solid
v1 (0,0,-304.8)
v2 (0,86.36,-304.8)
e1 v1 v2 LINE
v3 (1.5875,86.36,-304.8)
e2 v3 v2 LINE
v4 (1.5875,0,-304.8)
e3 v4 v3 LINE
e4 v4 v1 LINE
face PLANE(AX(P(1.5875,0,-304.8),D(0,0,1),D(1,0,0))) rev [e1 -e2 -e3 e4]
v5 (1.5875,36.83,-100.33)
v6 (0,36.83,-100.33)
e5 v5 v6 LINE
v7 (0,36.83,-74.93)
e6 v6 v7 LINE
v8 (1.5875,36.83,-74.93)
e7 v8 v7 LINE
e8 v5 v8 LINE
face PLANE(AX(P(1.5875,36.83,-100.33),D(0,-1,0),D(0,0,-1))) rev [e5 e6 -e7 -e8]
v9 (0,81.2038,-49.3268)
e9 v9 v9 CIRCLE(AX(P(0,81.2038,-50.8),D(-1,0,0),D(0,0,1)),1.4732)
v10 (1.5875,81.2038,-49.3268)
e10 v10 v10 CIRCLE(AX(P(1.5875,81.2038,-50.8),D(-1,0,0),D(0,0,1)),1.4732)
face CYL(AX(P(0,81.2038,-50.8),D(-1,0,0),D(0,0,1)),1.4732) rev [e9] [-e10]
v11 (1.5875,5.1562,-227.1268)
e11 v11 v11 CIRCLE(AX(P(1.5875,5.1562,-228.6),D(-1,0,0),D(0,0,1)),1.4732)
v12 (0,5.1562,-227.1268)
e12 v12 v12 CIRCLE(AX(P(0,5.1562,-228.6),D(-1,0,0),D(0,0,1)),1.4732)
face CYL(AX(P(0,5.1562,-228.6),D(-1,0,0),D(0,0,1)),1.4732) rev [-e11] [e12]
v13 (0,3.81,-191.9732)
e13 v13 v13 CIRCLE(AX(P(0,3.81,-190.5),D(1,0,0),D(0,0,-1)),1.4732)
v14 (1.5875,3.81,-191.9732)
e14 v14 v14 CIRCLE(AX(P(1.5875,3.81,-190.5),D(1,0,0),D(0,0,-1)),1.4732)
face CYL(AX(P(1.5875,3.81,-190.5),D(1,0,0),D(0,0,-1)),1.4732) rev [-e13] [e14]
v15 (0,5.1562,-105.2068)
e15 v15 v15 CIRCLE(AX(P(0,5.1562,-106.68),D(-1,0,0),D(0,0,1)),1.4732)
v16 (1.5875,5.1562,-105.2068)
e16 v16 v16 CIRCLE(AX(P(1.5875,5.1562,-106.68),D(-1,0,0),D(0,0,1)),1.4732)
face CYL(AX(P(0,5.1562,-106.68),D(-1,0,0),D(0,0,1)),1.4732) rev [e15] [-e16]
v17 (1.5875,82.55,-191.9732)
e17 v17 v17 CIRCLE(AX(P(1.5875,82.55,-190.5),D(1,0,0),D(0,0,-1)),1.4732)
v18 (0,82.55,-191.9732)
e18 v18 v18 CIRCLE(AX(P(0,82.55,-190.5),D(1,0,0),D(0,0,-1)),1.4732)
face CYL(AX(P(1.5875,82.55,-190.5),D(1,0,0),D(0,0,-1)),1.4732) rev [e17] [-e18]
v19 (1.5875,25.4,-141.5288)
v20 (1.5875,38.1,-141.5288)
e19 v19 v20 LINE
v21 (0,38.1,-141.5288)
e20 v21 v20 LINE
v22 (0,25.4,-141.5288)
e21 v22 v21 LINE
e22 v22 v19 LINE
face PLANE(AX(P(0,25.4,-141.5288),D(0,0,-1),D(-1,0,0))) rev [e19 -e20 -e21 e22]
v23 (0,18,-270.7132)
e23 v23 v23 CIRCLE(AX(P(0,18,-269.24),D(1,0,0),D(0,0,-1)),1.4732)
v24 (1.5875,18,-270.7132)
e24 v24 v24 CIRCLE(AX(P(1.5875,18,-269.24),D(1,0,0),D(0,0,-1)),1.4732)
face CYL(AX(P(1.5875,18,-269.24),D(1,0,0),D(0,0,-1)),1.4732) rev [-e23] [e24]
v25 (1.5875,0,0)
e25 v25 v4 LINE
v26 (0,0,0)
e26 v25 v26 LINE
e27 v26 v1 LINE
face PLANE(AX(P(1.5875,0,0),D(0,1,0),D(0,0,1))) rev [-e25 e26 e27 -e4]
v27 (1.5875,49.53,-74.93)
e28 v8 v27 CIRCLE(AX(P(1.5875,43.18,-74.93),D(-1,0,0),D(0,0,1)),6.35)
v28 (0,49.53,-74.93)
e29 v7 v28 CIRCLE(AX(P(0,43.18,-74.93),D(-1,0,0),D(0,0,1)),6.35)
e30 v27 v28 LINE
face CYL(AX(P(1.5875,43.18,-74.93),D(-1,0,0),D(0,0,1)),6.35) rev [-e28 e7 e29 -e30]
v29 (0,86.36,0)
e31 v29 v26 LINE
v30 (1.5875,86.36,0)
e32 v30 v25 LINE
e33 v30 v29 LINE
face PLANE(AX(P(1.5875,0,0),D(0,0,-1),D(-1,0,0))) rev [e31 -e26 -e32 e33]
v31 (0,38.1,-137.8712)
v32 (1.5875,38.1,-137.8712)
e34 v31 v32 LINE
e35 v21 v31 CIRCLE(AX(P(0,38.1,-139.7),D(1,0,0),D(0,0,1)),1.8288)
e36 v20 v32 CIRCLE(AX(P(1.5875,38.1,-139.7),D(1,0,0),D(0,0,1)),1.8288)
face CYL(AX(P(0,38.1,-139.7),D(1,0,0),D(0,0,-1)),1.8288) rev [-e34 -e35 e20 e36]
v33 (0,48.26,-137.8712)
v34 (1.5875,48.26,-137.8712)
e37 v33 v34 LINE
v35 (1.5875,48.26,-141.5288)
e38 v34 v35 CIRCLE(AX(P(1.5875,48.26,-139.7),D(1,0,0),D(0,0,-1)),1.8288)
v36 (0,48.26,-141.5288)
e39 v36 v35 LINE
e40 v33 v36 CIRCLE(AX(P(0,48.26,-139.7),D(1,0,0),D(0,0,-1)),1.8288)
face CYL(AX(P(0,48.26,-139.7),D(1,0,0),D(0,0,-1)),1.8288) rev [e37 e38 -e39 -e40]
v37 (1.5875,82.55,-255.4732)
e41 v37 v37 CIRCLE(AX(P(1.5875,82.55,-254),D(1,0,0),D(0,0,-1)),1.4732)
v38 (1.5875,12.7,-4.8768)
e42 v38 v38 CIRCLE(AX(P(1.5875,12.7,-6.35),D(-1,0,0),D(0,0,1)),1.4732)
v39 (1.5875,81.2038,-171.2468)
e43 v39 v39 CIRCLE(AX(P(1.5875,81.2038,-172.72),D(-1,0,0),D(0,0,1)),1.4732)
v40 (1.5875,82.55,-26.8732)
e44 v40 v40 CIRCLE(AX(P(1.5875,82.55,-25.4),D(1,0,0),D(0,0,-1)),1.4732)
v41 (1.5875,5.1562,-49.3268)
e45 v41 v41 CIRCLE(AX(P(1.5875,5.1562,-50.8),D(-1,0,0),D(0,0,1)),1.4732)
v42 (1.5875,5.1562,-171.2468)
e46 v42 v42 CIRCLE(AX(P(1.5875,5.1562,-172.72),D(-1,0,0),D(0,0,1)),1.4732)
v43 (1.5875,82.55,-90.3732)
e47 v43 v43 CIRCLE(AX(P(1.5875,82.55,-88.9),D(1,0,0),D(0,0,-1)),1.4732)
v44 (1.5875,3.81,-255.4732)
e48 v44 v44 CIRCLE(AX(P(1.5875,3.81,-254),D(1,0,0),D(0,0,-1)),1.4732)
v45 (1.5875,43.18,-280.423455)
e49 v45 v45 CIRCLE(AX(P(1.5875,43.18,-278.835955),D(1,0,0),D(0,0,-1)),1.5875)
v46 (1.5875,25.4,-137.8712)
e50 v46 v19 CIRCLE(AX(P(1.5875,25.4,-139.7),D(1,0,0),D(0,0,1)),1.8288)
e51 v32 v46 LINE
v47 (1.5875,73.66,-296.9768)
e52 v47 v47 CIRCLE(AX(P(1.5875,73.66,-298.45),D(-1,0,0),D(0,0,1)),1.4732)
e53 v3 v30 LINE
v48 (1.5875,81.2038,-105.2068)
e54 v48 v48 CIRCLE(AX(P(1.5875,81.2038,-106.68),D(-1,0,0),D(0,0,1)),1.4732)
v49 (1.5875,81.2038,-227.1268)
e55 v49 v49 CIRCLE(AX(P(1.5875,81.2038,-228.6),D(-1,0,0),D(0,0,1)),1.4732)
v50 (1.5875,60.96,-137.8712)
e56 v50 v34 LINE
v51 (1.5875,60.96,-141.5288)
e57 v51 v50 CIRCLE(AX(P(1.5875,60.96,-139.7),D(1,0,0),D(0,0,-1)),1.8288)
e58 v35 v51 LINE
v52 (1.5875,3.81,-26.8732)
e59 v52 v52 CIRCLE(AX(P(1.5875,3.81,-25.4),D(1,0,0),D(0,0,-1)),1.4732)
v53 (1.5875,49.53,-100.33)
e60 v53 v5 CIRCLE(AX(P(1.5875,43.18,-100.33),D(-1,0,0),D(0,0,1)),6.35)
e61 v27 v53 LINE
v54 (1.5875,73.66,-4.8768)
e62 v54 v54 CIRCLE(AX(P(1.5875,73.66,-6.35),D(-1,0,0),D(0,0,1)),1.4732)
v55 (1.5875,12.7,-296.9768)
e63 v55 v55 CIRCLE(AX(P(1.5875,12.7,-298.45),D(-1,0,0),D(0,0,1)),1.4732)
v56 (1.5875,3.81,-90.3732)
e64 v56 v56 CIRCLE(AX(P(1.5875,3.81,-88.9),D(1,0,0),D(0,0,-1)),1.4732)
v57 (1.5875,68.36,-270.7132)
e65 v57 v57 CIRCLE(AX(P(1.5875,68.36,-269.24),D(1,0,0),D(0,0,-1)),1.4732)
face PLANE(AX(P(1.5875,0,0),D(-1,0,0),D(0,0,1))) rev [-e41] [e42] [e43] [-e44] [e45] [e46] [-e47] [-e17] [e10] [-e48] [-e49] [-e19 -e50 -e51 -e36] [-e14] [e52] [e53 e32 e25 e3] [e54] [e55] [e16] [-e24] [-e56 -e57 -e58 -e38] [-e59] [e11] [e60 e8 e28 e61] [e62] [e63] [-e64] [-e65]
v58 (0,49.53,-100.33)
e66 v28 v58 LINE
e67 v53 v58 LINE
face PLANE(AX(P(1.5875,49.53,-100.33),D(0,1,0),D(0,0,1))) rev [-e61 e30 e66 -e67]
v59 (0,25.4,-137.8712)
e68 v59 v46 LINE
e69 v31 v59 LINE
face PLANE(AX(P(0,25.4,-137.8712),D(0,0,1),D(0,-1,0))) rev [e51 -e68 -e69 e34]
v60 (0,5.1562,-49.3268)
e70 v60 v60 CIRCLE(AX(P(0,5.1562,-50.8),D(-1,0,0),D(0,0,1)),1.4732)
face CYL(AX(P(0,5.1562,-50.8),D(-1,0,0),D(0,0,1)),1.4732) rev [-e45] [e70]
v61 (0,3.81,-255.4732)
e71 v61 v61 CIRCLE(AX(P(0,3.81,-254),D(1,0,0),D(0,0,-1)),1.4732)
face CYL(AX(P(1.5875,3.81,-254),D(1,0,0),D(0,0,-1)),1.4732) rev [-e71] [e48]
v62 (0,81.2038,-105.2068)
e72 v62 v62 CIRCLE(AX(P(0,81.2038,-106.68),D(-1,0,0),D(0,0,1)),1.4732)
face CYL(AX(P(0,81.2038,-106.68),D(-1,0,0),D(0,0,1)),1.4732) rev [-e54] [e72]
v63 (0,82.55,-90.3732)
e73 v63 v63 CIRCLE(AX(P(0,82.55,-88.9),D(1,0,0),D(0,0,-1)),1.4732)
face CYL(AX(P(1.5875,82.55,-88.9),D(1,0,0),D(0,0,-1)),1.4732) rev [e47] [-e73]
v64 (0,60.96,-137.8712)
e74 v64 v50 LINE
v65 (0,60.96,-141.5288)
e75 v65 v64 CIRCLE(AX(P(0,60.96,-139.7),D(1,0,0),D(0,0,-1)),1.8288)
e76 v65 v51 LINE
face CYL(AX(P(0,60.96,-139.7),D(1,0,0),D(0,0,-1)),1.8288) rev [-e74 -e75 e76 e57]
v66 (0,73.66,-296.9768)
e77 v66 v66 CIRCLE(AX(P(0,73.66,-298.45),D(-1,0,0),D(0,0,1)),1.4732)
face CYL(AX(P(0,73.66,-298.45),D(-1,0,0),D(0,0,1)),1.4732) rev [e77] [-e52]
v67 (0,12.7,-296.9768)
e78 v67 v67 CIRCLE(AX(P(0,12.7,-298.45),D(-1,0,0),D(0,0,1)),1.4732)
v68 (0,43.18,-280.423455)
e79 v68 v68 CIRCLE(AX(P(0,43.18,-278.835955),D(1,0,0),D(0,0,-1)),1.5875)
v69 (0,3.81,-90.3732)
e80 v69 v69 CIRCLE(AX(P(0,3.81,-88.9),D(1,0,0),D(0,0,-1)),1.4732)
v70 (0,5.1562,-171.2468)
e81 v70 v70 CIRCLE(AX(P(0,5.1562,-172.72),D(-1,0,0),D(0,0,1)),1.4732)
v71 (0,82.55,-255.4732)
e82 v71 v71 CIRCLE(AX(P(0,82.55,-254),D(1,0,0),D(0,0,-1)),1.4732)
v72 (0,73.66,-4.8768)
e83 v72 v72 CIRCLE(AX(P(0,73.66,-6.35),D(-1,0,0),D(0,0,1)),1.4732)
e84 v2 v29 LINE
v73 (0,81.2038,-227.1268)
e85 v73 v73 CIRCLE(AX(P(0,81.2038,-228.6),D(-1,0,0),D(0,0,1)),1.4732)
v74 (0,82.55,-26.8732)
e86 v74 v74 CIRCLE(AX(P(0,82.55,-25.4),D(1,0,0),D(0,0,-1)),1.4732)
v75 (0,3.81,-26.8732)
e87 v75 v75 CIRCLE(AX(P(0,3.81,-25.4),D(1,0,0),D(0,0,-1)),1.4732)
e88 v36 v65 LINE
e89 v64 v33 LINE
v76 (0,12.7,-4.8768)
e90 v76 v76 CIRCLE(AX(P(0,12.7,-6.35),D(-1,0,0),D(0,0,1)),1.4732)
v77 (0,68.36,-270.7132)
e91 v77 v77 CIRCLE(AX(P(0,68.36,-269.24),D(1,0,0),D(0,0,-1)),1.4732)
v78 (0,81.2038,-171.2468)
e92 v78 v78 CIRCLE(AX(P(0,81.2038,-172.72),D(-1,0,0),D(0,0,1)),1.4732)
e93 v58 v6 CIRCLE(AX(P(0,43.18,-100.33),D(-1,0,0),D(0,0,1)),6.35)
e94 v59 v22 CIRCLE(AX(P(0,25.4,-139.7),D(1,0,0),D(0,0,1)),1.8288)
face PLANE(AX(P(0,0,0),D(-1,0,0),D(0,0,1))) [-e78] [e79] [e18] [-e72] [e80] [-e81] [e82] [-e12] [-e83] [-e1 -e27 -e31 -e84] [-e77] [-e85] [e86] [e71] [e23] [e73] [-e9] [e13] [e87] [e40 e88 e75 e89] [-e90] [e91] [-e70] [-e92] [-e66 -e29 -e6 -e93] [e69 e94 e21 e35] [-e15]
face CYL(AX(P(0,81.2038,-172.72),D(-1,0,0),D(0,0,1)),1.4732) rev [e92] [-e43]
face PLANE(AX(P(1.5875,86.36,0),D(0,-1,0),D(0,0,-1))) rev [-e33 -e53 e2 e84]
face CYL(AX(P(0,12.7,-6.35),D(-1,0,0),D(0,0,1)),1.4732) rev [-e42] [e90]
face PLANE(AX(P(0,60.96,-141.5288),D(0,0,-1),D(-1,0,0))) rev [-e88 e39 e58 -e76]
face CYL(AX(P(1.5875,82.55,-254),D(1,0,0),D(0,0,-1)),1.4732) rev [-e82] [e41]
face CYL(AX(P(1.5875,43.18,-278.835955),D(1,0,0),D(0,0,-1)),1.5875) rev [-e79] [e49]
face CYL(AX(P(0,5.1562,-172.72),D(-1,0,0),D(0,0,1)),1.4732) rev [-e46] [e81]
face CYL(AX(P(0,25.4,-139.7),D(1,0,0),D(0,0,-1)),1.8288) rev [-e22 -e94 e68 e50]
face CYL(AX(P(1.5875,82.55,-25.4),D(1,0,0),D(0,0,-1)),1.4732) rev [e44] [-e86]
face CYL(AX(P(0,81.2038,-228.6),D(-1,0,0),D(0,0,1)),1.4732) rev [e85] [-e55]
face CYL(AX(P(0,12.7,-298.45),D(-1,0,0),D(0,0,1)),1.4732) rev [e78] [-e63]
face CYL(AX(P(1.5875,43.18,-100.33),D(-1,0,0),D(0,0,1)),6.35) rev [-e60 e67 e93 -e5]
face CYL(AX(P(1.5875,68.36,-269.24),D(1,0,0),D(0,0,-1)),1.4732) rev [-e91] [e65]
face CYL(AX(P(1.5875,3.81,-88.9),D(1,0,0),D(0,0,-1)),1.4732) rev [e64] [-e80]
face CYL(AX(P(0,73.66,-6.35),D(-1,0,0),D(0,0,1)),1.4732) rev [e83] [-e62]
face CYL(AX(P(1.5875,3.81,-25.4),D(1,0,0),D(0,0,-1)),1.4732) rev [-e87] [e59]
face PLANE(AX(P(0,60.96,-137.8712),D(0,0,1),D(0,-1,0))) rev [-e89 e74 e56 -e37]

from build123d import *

# Parameters (mm, degrees)
SKETCH1_W                     = 304.8
SKETCH1_H                     = 86.36
BOSS_EXTRUDE1_DEPTH           = 1.5875
F_4_CLEARANCE_HOLE1_OUTLINE_R = 1.4732
F_4_CLEARANCE_HOLE1_DEPTH     = 1.5875
F_1_8_0_125_DIAMETER_HOLE1_D  = 3.175
CUT_EXTRUDE1_DEPTH            = 317.802161855
F_4_CLEARANCE_HOLE2_D         = 2.9464
F_4_CLEARANCE_HOLE2_DEPTH     = 9.1694
F_4_CLEARANCE_HOLE2_TIP       = 0.885187864
CUT_EXTRUDE3_DEPTH            = 317.802161855
F_4_CLEARANCE_HOLE3_D         = 2.9464
F_4_CLEARANCE_HOLE3_DEPTH     = 9.1694
F_4_CLEARANCE_HOLE3_TIP       = 0.885187864


# Read off the part's stored shape, not the designer's step: #4 Clearance Hole1
with BuildPart() as part:
    # Sketch1 → Boss-Extrude1 (new body)
    with BuildSketch(Plane(origin=(0, 0, 0), x_dir=(0, 0, -1), z_dir=(1, 0, 0))):
        with Locations((152.4, 43.18)):
            Rectangle(SKETCH1_W, SKETCH1_H)
    extrude(amount=BOSS_EXTRUDE1_DEPTH)

    # #4 Clearance Hole1 outline → #4 Clearance Hole1 (cut)
    with BuildSketch(Plane.YZ):
        with Locations((68.36, -269.24)):
            Circle(F_4_CLEARANCE_HOLE1_OUTLINE_R)
        with Locations((18, -269.24)):
            Circle(F_4_CLEARANCE_HOLE1_OUTLINE_R)
        with Locations((82.55, -25.4)):
            Circle(F_4_CLEARANCE_HOLE1_OUTLINE_R)
        with Locations((82.55, -88.9)):
            Circle(F_4_CLEARANCE_HOLE1_OUTLINE_R)
        with Locations((82.55, -190.5)):
            Circle(F_4_CLEARANCE_HOLE1_OUTLINE_R)
        with Locations((82.55, -254)):
            Circle(F_4_CLEARANCE_HOLE1_OUTLINE_R)
        with Locations((3.81, -254)):
            Circle(F_4_CLEARANCE_HOLE1_OUTLINE_R)
        with Locations((3.81, -190.5)):
            Circle(F_4_CLEARANCE_HOLE1_OUTLINE_R)
        with Locations((3.81, -88.9)):
            Circle(F_4_CLEARANCE_HOLE1_OUTLINE_R)
        with Locations((3.81, -25.4)):
            Circle(F_4_CLEARANCE_HOLE1_OUTLINE_R)
    extrude(amount=F_4_CLEARANCE_HOLE1_DEPTH, mode=Mode.SUBTRACT)

    # 1/8 (0.125) Diameter Hole1 (through all)
    with Locations(Plane(origin=(1.5875, 0, 0), x_dir=(0, 0, -1), z_dir=(1, 0, 0))):
        with Locations((278.8359549, 43.18)):
            Hole(F_1_8_0_125_DIAMETER_HOLE1_D / 2)

    # Sketch6 → Cut-Extrude1 (cut, through all)
    with BuildSketch(Plane(origin=(1.5875, 0, 0), x_dir=(0, 0, -1), z_dir=(1, 0, 0))):
        with BuildLine():
            Line((141.5288, 60.96), (141.5288, 48.26))
            ThreePointArc((141.5288, 48.26), (139.7, 46.4312), (137.8712, 48.26))
            Line((137.8712, 48.26), (137.8712, 60.96))
            ThreePointArc((137.8712, 60.96), (139.7, 62.7888), (141.5288, 60.96))
        make_face()
        with BuildLine():
            Line((141.5288, 25.4), (141.5288, 38.1))
            ThreePointArc((141.5288, 38.1), (139.7, 39.9288), (137.8712, 38.1))
            Line((137.8712, 38.1), (137.8712, 25.4))
            ThreePointArc((137.8712, 25.4), (139.7, 23.5712), (141.5288, 25.4))
        make_face()
    extrude(amount=-CUT_EXTRUDE1_DEPTH, mode=Mode.SUBTRACT)

    # #4 Clearance Hole2
    with Locations(Plane.ZY):
        with Locations((-228.6, 5.1562), (-228.6, 81.2038), (-172.72, 5.1562), (-172.72, 81.2038), (-106.68, 5.1562), (-50.8, 5.1562), (-106.68, 81.2038), (-50.8, 81.2038)):
            Hole(F_4_CLEARANCE_HOLE2_D / 2, depth=F_4_CLEARANCE_HOLE2_DEPTH)
            with Locations((0, 0, -(F_4_CLEARANCE_HOLE2_DEPTH + F_4_CLEARANCE_HOLE2_TIP / 2))):  # 118° drill point
                Cone(0, F_4_CLEARANCE_HOLE2_D / 2, F_4_CLEARANCE_HOLE2_TIP, mode=Mode.SUBTRACT)

    # Sketch10 → Cut-Extrude3 (cut, through all)
    with BuildSketch(Plane.ZY):
        with BuildLine():
            Line((-100.33, 49.53), (-74.93, 49.53))
            ThreePointArc((-74.93, 49.53), (-68.58, 43.18), (-74.93, 36.83))
            Line((-74.93, 36.83), (-100.33, 36.83))
            ThreePointArc((-100.33, 36.83), (-106.68, 43.18), (-100.33, 49.53))
        make_face()
    extrude(amount=-CUT_EXTRUDE3_DEPTH, mode=Mode.SUBTRACT)

    # #4 Clearance Hole3
    with Locations(Plane.ZY):
        with Locations((-6.35, 12.7), (-6.35, 73.66), (-298.45, 12.7), (-298.45, 73.66)):
            Hole(F_4_CLEARANCE_HOLE3_D / 2, depth=F_4_CLEARANCE_HOLE3_DEPTH)
            with Locations((0, 0, -(F_4_CLEARANCE_HOLE3_DEPTH + F_4_CLEARANCE_HOLE3_TIP / 2))):  # 118° drill point
                Cone(0, F_4_CLEARANCE_HOLE3_D / 2, F_4_CLEARANCE_HOLE3_TIP, mode=Mode.SUBTRACT)


solid = part.part
